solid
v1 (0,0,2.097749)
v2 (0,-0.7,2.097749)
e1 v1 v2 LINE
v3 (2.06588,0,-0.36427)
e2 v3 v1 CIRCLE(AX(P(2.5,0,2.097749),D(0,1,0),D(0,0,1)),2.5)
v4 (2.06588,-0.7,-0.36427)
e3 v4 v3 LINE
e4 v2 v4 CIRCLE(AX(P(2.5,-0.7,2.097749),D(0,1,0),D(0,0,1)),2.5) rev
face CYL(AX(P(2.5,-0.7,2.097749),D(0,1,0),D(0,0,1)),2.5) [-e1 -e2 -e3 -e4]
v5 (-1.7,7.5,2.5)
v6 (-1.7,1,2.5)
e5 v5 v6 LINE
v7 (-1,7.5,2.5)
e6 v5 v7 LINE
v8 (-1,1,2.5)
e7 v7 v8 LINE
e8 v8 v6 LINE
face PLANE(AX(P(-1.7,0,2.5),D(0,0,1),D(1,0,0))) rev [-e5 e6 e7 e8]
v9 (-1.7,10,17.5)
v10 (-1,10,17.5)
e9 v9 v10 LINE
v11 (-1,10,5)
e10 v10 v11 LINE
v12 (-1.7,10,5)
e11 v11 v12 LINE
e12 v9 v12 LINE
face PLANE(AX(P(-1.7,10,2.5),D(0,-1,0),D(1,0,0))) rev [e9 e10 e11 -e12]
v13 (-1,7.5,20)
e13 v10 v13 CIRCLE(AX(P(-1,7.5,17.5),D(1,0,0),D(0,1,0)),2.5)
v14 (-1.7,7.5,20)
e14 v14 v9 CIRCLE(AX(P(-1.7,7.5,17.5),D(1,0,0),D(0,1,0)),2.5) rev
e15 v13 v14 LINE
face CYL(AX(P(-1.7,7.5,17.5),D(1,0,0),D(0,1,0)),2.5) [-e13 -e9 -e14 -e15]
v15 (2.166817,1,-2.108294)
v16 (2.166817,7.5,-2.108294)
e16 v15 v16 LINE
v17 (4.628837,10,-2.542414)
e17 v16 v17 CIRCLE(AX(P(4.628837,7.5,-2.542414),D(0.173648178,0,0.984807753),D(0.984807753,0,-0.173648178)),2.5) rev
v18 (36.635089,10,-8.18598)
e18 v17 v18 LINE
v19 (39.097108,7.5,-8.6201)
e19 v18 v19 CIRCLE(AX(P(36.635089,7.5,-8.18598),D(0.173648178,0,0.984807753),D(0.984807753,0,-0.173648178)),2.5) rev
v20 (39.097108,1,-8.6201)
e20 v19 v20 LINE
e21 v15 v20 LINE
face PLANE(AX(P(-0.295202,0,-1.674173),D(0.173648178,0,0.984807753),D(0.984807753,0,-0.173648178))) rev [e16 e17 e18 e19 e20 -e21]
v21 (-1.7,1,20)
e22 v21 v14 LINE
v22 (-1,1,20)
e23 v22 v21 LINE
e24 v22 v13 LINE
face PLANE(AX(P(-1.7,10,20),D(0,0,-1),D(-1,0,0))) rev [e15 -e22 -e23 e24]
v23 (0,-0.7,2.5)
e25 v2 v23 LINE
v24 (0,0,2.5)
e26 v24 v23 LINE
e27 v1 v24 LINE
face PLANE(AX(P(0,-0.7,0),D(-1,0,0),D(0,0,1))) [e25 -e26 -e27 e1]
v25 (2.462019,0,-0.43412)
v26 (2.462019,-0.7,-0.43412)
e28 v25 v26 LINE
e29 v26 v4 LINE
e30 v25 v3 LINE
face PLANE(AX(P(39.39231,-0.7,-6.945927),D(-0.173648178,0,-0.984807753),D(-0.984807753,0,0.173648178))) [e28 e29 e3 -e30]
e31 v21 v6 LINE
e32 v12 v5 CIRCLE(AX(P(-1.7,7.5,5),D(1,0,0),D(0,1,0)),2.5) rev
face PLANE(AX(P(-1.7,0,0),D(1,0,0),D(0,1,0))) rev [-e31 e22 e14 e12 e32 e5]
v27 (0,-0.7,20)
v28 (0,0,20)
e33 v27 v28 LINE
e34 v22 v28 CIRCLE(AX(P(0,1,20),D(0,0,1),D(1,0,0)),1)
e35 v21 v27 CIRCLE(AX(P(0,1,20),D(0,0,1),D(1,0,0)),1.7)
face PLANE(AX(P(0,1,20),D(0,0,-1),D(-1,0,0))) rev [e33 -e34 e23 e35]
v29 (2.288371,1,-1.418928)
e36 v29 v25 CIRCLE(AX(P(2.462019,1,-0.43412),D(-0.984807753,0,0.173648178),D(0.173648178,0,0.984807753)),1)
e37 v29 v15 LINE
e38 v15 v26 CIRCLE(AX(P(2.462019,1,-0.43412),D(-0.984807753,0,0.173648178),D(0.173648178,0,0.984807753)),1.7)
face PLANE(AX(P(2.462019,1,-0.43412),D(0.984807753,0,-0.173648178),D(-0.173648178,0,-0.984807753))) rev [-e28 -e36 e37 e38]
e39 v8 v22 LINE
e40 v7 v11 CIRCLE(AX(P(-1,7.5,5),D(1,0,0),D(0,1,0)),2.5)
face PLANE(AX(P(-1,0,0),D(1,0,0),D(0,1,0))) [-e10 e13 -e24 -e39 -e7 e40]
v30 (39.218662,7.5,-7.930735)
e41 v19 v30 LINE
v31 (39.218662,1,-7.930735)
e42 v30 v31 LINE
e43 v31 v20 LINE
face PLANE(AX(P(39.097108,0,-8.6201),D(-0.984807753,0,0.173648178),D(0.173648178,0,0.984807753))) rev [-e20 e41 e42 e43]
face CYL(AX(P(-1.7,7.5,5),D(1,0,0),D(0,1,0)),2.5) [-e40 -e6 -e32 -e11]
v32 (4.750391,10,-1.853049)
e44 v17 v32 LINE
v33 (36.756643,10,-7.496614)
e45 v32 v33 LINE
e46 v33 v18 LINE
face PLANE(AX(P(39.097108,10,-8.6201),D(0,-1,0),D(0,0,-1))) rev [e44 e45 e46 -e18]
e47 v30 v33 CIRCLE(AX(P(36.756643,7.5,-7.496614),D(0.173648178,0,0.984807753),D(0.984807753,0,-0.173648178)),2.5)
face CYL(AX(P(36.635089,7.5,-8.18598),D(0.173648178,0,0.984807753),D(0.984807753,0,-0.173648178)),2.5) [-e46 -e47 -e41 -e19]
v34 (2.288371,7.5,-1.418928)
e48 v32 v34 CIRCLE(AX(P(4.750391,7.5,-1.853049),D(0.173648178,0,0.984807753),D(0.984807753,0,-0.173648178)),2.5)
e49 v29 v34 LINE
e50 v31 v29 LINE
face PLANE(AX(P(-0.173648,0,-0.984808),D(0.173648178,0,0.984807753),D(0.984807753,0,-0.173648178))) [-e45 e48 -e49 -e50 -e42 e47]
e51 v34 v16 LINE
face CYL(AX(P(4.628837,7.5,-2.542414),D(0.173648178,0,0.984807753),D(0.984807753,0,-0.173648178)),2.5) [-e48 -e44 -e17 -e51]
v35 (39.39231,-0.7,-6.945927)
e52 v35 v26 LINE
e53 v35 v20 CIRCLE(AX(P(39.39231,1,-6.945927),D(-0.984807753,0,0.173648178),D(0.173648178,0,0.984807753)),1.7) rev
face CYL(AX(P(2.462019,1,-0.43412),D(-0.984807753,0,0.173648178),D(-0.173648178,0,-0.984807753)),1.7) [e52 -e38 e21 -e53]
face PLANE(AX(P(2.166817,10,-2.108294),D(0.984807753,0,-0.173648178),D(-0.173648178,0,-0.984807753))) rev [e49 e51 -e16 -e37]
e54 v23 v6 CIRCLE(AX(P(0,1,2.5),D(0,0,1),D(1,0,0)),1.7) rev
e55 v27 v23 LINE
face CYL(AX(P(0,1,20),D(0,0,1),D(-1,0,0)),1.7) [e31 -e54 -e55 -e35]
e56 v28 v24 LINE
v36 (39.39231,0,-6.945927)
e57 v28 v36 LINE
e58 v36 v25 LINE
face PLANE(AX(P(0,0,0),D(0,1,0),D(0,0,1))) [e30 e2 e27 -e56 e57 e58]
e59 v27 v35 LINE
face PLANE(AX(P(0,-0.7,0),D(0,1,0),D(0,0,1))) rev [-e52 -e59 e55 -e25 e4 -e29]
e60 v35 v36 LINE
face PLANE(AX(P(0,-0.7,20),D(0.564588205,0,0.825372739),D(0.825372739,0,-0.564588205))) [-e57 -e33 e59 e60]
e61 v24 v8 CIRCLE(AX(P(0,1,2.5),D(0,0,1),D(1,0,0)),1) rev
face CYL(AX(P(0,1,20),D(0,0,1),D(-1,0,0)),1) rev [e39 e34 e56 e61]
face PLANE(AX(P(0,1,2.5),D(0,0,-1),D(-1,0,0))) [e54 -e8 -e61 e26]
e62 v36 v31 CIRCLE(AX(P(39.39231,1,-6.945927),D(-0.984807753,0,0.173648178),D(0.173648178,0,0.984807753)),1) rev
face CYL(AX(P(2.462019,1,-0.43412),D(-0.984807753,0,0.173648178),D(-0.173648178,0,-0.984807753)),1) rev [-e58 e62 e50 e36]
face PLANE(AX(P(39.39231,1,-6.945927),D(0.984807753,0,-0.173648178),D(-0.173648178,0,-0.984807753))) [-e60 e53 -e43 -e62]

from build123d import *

# Parameters (mm, degrees)
BASE_FLANGE1_DEPTH      = 0.7
EDGE_FLANGE1_DEPTH      = 17.5
EDGE_FLANGE1_BEND_DEPTH = 37.5
BREAK_CORNER1_START     = -1.7
BREAK_CORNER1_DEPTH     = 0.7
BREAK_CORNER1_2_DEPTH   = 0.7
BREAK_CORNER1_START_2   = -0.7
BREAK_CORNER1_3_DEPTH   = 0.7


# Read off the part's stored shape, not the designer's step: Break-Corner1
# Sheet-metal steps are written as plain solids
with BuildPart() as part:
    # Sketch1 → Base-Flange1 (new body)
    with BuildSketch(Plane(origin=(0, 0, 0), x_dir=(1, 0, 0), z_dir=(0, 1, 0))):
        Polygon((0, 0), (0, -20), (39.39231012, 6.945927107), align=None)
    extrude(amount=-BASE_FLANGE1_DEPTH)

    # Edge-Flange1 section (across the edge) → Edge-Flange1 (add)
    with BuildSketch(Plane(origin=(-1, 0, 2.5), x_dir=(1, 0, 0), z_dir=(0, 0, 1))):
        with BuildLine():
            Line((-0.7, 1), (-0.7, 10))
            Line((-0.7, 10), (0, 10))
            Line((0, 10), (0, 1))
            ThreePointArc((0, 1), (0.292893219, 0.292893219), (1, 0))
            Line((1, 0), (1, -0.7))
            ThreePointArc((1, -0.7), (-0.202081528, -0.202081528), (-0.7, 1))
        make_face()
    extrude(amount=EDGE_FLANGE1_DEPTH)

    # Edge-Flange1 section 2 (across the edge) → Edge-Flange1 bend (add)
    with BuildSketch(Plane(origin=(39.218661943, 0, -7.93073486), x_dir=(0.1736481776669273, 3.4914813388431334e-15, 0.9848077530122086), z_dir=(-0.9848077530122086, 0, 0.1736481776669273))):
        with BuildLine():
            Line((-0.7, 1), (-0.7, 10))
            Line((-0.7, 10), (0, 10))
            Line((0, 10), (0, 1))
            ThreePointArc((0, 1), (0.292893219, 0.292893219), (1, 0))
            Line((1, 0), (1, -0.7))
            ThreePointArc((1, -0.7), (-0.202081528, -0.202081528), (-0.7, 1))
        make_face()
    extrude(amount=EDGE_FLANGE1_BEND_DEPTH)

    # Break-Corner1 outline → Break-Corner1 (cut)
    with BuildSketch(Plane(origin=(0, 0, 0), x_dir=(0.9848077530122086, 0, -0.173648177666927), z_dir=(0.17364817766692697, 0, 0.9848077530122088)).offset(BREAK_CORNER1_START)):
        with BuildLine():
            ThreePointArc((2.5, 7.5), (3.232233047, 9.267766953), (5, 10))
            Line((5, 10), (2.5, 10))
            Line((2.5, 10), (2.5, 7.5))
        make_face()
        with BuildLine():
            ThreePointArc((37.5, 10), (39.267766953, 9.267766953), (40, 7.5))
            Line((40, 7.5), (40, 10))
            Line((40, 10), (37.5, 10))
        make_face()
    extrude(amount=BREAK_CORNER1_DEPTH, mode=Mode.SUBTRACT)

    # Break-Corner1 2 outline → Break-Corner1 2 (cut)
    with BuildSketch(Plane.YZ.offset(BREAK_CORNER1_START)):
        with BuildLine():
            ThreePointArc((7.5, 20), (9.267766953, 19.267766953), (10, 17.5))
            Line((10, 17.5), (10, 20))
            Line((10, 20), (7.5, 20))
        make_face()
        with BuildLine():
            ThreePointArc((10, 5), (9.267766953, 3.232233047), (7.5, 2.5))
            Line((7.5, 2.5), (10, 2.5))
            Line((10, 2.5), (10, 5))
        make_face()
    extrude(amount=BREAK_CORNER1_2_DEPTH, mode=Mode.SUBTRACT)

    # Break-Corner1 3 outline → Break-Corner1 3 (cut)
    with BuildSketch(Plane(origin=(0, 0, 0), x_dir=(1, 0, 0), z_dir=(0, 1, 0)).offset(BREAK_CORNER1_START_2)):
        with BuildLine():
            ThreePointArc((0, -2.097749078), (0.584888892, -0.490780054), (2.065879556, 0.364270305))
            Line((2.065879556, 0.364270305), (0, 0))
            Line((0, 0), (0, -2.097749078))
        make_face()
    extrude(amount=BREAK_CORNER1_3_DEPTH, mode=Mode.SUBTRACT)


solid = part.part
